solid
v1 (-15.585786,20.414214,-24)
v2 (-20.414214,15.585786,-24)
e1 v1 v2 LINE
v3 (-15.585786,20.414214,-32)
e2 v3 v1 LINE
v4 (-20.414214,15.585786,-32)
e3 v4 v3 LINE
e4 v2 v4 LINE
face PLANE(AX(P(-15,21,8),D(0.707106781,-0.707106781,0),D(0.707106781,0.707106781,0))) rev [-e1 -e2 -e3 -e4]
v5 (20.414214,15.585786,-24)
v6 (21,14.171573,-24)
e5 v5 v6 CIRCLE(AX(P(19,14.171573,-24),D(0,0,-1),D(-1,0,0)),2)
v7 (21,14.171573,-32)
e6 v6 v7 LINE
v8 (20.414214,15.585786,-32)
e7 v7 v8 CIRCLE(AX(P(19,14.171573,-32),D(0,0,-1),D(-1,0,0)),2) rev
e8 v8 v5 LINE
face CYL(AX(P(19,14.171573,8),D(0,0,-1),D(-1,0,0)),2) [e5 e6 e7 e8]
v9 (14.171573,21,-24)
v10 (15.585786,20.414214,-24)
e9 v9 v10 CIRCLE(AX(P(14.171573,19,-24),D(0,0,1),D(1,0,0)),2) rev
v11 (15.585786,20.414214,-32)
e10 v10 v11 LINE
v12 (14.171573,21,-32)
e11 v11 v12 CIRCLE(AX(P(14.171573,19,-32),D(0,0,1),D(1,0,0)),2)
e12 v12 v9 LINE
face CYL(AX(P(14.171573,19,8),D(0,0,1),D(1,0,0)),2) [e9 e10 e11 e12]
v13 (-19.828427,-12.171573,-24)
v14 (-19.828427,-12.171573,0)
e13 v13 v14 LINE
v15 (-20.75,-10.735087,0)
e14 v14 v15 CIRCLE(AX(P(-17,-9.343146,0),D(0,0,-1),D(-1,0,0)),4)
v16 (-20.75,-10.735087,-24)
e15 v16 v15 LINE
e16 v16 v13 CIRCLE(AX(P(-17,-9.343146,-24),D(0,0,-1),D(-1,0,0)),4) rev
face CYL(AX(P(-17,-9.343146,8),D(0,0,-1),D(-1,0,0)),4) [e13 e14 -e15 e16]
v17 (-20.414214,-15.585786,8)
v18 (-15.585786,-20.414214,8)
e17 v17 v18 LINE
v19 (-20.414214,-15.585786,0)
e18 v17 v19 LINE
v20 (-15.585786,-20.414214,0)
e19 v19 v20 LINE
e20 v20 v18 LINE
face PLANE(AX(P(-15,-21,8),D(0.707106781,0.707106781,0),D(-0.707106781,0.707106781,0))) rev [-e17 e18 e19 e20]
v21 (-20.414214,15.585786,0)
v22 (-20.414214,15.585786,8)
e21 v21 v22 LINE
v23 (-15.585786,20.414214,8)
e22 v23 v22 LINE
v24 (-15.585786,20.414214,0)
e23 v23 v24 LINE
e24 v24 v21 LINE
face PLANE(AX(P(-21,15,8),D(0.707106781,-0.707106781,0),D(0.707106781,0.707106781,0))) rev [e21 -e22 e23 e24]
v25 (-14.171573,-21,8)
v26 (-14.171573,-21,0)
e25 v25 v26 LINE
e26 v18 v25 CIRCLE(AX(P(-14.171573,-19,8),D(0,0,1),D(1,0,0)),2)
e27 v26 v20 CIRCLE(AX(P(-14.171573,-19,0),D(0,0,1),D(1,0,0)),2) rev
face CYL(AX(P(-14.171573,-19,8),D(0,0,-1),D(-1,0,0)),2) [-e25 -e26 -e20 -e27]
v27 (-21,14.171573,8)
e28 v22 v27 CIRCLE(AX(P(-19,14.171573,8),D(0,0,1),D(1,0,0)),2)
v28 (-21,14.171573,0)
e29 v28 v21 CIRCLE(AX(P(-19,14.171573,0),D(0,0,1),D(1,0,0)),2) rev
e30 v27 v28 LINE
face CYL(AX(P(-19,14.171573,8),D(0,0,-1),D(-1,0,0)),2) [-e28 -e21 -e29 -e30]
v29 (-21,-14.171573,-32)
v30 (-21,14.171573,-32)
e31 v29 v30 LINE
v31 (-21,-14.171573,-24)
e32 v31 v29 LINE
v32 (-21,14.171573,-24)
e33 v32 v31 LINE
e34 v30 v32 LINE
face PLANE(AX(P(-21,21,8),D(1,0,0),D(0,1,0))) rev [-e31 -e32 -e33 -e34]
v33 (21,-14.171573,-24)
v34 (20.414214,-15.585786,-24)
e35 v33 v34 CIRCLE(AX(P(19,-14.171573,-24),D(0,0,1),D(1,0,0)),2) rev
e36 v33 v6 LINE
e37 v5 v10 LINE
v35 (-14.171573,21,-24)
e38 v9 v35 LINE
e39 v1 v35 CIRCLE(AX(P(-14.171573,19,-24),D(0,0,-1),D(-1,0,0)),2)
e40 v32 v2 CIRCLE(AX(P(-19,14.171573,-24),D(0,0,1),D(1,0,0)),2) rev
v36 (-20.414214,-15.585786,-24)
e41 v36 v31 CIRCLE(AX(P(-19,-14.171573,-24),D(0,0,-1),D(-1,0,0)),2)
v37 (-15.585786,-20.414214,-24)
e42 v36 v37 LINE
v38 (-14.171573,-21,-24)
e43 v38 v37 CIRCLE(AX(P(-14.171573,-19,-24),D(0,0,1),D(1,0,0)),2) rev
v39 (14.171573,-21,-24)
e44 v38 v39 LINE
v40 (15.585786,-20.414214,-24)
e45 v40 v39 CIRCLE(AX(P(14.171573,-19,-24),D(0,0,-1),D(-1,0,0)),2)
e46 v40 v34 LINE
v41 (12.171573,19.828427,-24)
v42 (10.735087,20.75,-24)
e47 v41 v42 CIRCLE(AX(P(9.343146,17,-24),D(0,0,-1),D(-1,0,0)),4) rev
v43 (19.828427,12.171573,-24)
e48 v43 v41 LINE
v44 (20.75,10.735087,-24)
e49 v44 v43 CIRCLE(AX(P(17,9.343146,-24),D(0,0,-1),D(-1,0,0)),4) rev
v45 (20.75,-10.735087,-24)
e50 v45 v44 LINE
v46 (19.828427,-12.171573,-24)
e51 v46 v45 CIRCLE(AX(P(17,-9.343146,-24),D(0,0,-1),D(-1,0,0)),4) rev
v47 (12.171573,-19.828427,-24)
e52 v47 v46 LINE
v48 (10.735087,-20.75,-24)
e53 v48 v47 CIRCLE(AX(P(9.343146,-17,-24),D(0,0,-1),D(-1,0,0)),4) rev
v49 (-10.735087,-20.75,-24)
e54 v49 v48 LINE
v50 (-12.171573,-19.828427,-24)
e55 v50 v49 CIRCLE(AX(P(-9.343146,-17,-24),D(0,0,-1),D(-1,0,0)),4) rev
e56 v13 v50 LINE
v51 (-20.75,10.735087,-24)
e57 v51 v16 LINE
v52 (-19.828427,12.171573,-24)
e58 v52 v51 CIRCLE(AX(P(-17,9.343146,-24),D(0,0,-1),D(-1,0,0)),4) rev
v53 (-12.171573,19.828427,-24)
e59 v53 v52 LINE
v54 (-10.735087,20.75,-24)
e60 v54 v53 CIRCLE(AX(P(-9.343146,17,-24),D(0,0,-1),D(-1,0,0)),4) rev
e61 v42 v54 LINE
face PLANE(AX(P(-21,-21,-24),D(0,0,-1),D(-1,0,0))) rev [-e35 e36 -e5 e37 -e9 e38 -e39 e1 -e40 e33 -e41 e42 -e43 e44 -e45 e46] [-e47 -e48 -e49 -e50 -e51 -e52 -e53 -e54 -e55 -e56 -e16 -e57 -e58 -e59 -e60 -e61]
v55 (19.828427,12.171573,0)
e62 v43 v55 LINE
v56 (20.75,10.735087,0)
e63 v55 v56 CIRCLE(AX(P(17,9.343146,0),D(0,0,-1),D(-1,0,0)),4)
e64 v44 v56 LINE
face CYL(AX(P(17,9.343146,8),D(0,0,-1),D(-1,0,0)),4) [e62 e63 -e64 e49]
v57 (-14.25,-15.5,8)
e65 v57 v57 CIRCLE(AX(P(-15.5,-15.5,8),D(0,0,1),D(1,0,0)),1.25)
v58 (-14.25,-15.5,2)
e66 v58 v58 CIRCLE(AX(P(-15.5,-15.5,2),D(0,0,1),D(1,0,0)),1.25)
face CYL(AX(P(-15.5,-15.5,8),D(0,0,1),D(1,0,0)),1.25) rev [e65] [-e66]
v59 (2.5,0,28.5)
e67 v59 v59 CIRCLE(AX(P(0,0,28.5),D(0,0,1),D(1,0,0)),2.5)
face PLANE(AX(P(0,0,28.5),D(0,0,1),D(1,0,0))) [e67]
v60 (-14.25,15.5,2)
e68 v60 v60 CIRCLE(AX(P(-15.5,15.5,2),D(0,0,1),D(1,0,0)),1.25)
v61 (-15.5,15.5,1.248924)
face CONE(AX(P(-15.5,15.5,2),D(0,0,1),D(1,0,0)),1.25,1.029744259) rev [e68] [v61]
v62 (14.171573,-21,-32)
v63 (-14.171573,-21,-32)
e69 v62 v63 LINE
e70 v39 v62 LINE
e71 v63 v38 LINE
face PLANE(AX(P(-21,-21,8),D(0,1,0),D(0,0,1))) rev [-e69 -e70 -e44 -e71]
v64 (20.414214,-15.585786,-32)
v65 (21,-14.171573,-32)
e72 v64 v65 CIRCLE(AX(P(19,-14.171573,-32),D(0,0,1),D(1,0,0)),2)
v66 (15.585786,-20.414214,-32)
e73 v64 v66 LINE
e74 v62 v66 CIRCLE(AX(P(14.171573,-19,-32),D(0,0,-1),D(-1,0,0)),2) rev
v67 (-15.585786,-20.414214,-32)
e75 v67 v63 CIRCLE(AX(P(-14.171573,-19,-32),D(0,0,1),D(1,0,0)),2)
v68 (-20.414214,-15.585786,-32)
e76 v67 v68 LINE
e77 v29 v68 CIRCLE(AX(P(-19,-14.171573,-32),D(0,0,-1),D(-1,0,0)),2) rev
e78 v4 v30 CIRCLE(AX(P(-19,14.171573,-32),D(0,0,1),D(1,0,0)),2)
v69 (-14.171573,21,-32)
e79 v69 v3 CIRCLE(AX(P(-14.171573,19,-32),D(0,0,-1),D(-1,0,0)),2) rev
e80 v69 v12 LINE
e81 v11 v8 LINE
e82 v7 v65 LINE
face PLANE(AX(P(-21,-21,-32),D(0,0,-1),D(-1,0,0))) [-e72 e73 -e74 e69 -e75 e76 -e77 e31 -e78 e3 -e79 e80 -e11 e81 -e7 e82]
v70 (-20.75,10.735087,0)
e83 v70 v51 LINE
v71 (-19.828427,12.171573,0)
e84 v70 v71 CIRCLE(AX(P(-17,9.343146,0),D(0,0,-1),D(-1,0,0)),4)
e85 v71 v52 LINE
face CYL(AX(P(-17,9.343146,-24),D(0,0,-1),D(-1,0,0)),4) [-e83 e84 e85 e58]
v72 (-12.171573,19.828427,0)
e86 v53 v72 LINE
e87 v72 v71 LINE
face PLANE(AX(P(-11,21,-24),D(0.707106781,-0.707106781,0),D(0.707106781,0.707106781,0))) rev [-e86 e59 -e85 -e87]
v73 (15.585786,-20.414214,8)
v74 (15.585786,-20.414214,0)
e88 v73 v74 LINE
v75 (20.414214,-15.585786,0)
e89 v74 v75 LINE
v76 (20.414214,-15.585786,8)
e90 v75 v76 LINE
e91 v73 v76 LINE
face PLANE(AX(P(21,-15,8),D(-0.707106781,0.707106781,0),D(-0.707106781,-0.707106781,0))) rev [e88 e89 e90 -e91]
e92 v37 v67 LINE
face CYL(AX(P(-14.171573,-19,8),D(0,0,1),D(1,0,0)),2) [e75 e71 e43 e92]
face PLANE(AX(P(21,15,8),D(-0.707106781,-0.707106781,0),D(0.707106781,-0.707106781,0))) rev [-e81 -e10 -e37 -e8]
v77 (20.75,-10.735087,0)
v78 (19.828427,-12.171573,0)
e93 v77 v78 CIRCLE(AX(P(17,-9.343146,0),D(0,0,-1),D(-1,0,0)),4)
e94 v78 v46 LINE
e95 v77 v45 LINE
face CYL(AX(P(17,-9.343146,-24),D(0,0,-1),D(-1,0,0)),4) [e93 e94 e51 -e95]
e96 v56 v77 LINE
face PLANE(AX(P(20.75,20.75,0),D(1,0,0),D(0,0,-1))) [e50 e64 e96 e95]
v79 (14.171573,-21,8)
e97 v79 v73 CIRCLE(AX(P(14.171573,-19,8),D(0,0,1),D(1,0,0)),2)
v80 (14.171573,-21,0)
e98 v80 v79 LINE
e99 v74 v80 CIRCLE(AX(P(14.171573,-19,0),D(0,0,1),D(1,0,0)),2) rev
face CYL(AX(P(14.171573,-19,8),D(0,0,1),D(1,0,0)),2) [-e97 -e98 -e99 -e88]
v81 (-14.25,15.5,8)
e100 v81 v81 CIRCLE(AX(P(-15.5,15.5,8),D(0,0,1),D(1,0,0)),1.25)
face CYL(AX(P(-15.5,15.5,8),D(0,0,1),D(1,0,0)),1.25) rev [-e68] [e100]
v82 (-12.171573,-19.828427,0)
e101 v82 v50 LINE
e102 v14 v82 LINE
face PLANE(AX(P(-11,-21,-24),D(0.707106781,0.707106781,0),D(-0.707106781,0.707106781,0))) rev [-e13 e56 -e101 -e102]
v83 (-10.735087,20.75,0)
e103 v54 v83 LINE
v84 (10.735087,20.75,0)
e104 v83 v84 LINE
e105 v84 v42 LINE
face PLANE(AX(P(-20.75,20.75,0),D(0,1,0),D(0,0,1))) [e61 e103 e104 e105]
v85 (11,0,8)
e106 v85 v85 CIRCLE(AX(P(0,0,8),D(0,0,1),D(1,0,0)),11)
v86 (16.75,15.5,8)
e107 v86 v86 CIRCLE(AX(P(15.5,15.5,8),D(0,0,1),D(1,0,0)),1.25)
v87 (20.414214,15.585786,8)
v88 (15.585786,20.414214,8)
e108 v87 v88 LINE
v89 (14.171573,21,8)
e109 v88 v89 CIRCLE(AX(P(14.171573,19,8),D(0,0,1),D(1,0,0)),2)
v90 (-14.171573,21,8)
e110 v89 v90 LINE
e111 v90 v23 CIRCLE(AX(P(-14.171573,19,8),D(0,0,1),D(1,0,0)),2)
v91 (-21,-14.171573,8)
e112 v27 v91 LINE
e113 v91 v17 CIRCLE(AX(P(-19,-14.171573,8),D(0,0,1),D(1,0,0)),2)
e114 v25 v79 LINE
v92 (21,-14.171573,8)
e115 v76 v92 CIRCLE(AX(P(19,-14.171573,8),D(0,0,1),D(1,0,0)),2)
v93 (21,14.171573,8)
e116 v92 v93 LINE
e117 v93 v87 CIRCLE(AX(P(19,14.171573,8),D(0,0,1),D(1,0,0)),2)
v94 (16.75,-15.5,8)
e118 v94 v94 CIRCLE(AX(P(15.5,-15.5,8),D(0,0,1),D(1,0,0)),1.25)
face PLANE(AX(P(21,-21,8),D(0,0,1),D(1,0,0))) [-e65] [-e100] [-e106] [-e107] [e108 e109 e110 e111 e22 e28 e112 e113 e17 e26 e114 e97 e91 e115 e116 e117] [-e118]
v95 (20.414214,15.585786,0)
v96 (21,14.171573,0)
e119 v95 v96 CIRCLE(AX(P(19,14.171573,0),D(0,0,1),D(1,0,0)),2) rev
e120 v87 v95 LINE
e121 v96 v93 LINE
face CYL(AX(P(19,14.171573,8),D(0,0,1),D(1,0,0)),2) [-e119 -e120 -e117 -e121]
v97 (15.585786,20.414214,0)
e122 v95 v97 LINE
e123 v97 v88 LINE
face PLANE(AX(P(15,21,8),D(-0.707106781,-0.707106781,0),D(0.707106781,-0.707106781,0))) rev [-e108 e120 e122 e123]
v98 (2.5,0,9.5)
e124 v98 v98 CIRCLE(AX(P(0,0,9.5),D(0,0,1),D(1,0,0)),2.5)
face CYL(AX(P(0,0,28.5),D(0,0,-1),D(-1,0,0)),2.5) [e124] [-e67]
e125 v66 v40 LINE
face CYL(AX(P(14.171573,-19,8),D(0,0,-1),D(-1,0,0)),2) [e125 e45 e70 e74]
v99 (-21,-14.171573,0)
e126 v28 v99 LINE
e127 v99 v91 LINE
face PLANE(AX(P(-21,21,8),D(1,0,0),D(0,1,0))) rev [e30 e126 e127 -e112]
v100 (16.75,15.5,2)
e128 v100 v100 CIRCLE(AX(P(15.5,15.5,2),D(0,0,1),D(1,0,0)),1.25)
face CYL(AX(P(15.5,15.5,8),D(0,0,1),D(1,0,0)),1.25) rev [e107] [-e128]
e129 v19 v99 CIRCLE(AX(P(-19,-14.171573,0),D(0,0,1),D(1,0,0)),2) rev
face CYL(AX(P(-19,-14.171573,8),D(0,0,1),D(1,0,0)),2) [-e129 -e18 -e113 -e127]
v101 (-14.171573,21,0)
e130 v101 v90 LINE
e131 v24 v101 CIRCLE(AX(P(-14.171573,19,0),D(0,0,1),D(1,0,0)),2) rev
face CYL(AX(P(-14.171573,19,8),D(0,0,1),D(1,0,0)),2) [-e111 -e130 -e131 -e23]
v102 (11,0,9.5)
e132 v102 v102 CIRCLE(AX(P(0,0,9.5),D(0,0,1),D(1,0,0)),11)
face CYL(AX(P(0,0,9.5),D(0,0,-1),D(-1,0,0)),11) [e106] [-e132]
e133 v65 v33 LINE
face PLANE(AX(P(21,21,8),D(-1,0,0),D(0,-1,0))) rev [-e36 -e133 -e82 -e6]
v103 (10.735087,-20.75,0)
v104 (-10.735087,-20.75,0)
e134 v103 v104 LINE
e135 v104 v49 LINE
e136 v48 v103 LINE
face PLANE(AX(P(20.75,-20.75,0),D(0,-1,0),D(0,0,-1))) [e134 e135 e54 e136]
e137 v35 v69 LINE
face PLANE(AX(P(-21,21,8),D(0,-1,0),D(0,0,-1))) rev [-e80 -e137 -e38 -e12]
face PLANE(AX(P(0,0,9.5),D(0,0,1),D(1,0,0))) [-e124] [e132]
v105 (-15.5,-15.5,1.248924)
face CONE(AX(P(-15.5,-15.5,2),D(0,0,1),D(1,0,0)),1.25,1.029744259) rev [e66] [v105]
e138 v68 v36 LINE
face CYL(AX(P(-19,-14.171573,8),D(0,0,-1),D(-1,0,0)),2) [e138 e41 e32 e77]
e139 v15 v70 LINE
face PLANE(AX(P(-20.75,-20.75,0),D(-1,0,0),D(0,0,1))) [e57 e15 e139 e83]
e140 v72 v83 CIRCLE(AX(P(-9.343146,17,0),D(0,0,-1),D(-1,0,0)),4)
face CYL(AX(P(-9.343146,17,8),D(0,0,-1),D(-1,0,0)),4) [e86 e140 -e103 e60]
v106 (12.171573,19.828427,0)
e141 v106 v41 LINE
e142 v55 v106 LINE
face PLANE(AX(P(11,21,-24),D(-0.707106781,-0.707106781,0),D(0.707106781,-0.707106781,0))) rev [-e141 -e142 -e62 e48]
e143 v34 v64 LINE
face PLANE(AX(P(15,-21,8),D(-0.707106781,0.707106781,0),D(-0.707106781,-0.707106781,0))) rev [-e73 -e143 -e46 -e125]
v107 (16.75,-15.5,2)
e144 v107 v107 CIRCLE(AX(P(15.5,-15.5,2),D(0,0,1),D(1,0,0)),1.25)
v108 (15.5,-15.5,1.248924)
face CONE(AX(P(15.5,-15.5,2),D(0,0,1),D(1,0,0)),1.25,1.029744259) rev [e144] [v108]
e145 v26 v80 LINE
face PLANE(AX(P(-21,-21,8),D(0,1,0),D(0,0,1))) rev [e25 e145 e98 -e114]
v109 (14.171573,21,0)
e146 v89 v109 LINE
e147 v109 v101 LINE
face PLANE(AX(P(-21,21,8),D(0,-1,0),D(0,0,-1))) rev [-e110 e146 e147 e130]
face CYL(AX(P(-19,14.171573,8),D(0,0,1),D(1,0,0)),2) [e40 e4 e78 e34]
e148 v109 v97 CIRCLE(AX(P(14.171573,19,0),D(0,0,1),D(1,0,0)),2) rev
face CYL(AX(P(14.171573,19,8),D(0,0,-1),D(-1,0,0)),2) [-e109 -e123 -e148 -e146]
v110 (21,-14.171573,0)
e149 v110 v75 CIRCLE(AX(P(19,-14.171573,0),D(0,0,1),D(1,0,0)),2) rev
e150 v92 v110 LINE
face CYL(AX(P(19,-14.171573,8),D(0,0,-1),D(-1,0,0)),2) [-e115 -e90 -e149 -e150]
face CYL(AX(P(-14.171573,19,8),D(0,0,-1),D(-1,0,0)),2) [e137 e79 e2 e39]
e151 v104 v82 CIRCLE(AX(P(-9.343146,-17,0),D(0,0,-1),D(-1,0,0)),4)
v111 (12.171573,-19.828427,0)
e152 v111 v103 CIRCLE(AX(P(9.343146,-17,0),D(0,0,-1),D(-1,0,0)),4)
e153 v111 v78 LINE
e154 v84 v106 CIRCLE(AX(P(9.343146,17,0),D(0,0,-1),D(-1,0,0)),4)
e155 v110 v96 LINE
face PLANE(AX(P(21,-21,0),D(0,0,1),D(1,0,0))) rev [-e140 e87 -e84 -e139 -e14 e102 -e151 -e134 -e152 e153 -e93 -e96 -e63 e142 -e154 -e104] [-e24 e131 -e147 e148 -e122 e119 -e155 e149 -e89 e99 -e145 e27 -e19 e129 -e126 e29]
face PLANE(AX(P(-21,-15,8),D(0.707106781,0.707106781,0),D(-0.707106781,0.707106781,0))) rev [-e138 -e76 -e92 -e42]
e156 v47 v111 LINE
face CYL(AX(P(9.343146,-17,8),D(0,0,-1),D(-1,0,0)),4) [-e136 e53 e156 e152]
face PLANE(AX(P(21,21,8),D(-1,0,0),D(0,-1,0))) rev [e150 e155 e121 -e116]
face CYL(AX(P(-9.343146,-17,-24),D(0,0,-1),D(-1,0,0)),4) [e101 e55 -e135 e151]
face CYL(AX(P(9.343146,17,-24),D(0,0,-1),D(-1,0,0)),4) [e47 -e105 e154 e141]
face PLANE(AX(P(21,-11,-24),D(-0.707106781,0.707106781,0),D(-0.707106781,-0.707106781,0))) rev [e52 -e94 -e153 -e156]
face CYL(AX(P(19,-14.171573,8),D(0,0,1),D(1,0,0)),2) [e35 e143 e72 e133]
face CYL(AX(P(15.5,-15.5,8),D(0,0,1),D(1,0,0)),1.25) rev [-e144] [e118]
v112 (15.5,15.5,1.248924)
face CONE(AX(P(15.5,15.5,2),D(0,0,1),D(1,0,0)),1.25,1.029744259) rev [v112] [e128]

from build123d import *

# Parameters (mm, degrees)
EXTRUDE_START               = -40
EXTRUDE_2_DEPTH             = 40
EXTRUDE_START_2             = -8
EXTRUDE_2_2_DEPTH           = 8
EXTRUDE_2_3_DEPTH           = 8
EXTRUDE_2_4_OUTLINE_R       = 2.5
EXTRUDE_2_4_DEPTH           = 20.5
FILLET_1_R                  = 2
HOLE_WIZARD_2_5_2_5_1_D     = 2.5
HOLE_WIZARD_2_5_2_5_1_DEPTH = 6
HOLE_WIZARD_2_5_2_5_1_TIP   = 0.751075774
HOLE_WIZARD_2_5_2_5_2_D     = 2.5
HOLE_WIZARD_2_5_2_5_2_DEPTH = 6
HOLE_WIZARD_2_5_2_5_2_TIP   = 0.751075774
HOLE_WIZARD_2_5_2_5_3_D     = 2.5
HOLE_WIZARD_2_5_2_5_3_DEPTH = 6
HOLE_WIZARD_2_5_2_5_3_TIP   = 0.751075774
HOLE_WIZARD_2_5_2_5_4_D     = 2.5
HOLE_WIZARD_2_5_2_5_4_DEPTH = 6
HOLE_WIZARD_2_5_2_5_4_TIP   = 0.751075774
SKETCH_15_R                 = 11
SKETCH_15_R_2               = 2
EXTRUDE_3_DEPTH             = 1.5


with BuildPart() as part:
    # Бобышка-Вытянуть2: read off the stored shape, not the designer's step
    # Бобышка-Вытянуть2 outline → Бобышка-Вытянуть2 (new body)
    with BuildSketch(Plane.XY.offset(8).offset(EXTRUDE_START)):
        with BuildLine():
            ThreePointArc((19.828427125, -12.171572875), (20.366719307, -11.503053413), (20.75, -10.735086841))
            Line((20.75, -10.735086841), (20.75, 10.735086841))
            ThreePointArc((20.75, 10.735086841), (20.366719307, 11.503053413), (19.828427125, 12.171572875))
            Line((19.828427125, 12.171572875), (12.171572875, 19.828427125))
            ThreePointArc((12.171572875, 19.828427125), (11.503053413, 20.366719307), (10.735086841, 20.75))
            Line((10.735086841, 20.75), (-10.735086841, 20.75))
            ThreePointArc((-10.735086841, 20.75), (-11.503053413, 20.366719307), (-12.171572875, 19.828427125))
            Line((-12.171572875, 19.828427125), (-19.828427125, 12.171572875))
            ThreePointArc((-19.828427125, 12.171572875), (-20.366719307, 11.503053413), (-20.75, 10.735086841))
            Line((-20.75, 10.735086841), (-20.75, -10.735086841))
            ThreePointArc((-20.75, -10.735086841), (-20.366719307, -11.503053413), (-19.828427125, -12.171572875))
            Line((-19.828427125, -12.171572875), (-12.171572875, -19.828427125))
            ThreePointArc((-12.171572875, -19.828427125), (-11.503053413, -20.366719307), (-10.735086841, -20.75))
            Line((-10.735086841, -20.75), (10.735086841, -20.75))
            ThreePointArc((10.735086841, -20.75), (11.503053413, -20.366719307), (12.171572875, -19.828427125))
            Line((12.171572875, -19.828427125), (19.828427125, -12.171572875))
        make_face()
    extrude(amount=EXTRUDE_2_DEPTH)

    # Extrude 2 2 outline → Extrude 2 2 (add)
    with BuildSketch(Plane.XY.offset(8).offset(EXTRUDE_START_2)):
        Polygon((21, 15), (15, 21), (-15, 21), (-21, 15), (-21, -15), (-15, -21), (15, -21), (21, -15), align=None)
        with BuildLine():
            ThreePointArc((20.75, -10.735086841), (20.366719307, -11.503053413), (19.828427125, -12.171572875))
            Line((19.828427125, -12.171572875), (12.171572875, -19.828427125))
            ThreePointArc((12.171572875, -19.828427125), (11.503053413, -20.366719307), (10.735086841, -20.75))
            Line((10.735086841, -20.75), (-10.735086841, -20.75))
            ThreePointArc((-10.735086841, -20.75), (-11.503053413, -20.366719307), (-12.171572875, -19.828427125))
            Line((-12.171572875, -19.828427125), (-19.828427125, -12.171572875))
            ThreePointArc((-19.828427125, -12.171572875), (-20.366719307, -11.503053413), (-20.75, -10.735086841))
            Line((-20.75, -10.735086841), (-20.75, 10.735086841))
            ThreePointArc((-20.75, 10.735086841), (-20.366719307, 11.503053413), (-19.828427125, 12.171572875))
            Line((-19.828427125, 12.171572875), (-12.171572875, 19.828427125))
            ThreePointArc((-12.171572875, 19.828427125), (-11.503053413, 20.366719307), (-10.735086841, 20.75))
            Line((-10.735086841, 20.75), (10.735086841, 20.75))
            ThreePointArc((10.735086841, 20.75), (11.503053413, 20.366719307), (12.171572875, 19.828427125))
            Line((12.171572875, 19.828427125), (19.828427125, 12.171572875))
            ThreePointArc((19.828427125, 12.171572875), (20.366719307, 11.503053413), (20.75, 10.735086841))
            Line((20.75, 10.735086841), (20.75, -10.735086841))
        make_face(mode=Mode.SUBTRACT)
    extrude(amount=EXTRUDE_2_2_DEPTH)

    # Extrude 2 3 outline → Extrude 2 3 (add)
    with BuildSketch(Plane.XY.offset(8).offset(EXTRUDE_START)):
        with BuildLine():
            Line((21, -14.171572875), (21, 14.171572875))
            ThreePointArc((21, 14.171572875), (20.847759065, 14.93693974), (20.414213562, 15.585786438))
            Line((20.414213562, 15.585786438), (15.585786438, 20.414213562))
            ThreePointArc((15.585786438, 20.414213562), (14.93693974, 20.847759065), (14.171572875, 21))
            Line((14.171572875, 21), (-14.171572875, 21))
            ThreePointArc((-14.171572875, 21), (-14.93693974, 20.847759065), (-15.585786438, 20.414213562))
            Line((-15.585786438, 20.414213562), (-20.414213562, 15.585786438))
            ThreePointArc((-20.414213562, 15.585786438), (-20.847759065, 14.93693974), (-21, 14.171572875))
            Line((-21, 14.171572875), (-21, -14.171572875))
            ThreePointArc((-21, -14.171572875), (-20.847759065, -14.93693974), (-20.414213562, -15.585786438))
            Line((-20.414213562, -15.585786438), (-15.585786438, -20.414213562))
            ThreePointArc((-15.585786438, -20.414213562), (-14.93693974, -20.847759065), (-14.171572875, -21))
            Line((-14.171572875, -21), (14.171572875, -21))
            ThreePointArc((14.171572875, -21), (14.93693974, -20.847759065), (15.585786438, -20.414213562))
            Line((15.585786438, -20.414213562), (20.414213562, -15.585786438))
            ThreePointArc((20.414213562, -15.585786438), (20.847759065, -14.93693974), (21, -14.171572875))
        make_face()
        with BuildLine():
            Line((20.75, 10.735086841), (20.75, -10.735086841))
            ThreePointArc((20.75, -10.735086841), (20.366719307, -11.503053413), (19.828427125, -12.171572875))
            Line((19.828427125, -12.171572875), (12.171572875, -19.828427125))
            ThreePointArc((12.171572875, -19.828427125), (11.503053413, -20.366719307), (10.735086841, -20.75))
            Line((10.735086841, -20.75), (-10.735086841, -20.75))
            ThreePointArc((-10.735086841, -20.75), (-11.503053413, -20.366719307), (-12.171572875, -19.828427125))
            Line((-12.171572875, -19.828427125), (-19.828427125, -12.171572875))
            ThreePointArc((-19.828427125, -12.171572875), (-20.366719307, -11.503053413), (-20.75, -10.735086841))
            Line((-20.75, -10.735086841), (-20.75, 10.735086841))
            ThreePointArc((-20.75, 10.735086841), (-20.366719307, 11.503053413), (-19.828427125, 12.171572875))
            Line((-19.828427125, 12.171572875), (-12.171572875, 19.828427125))
            ThreePointArc((-12.171572875, 19.828427125), (-11.503053413, 20.366719307), (-10.735086841, 20.75))
            Line((-10.735086841, 20.75), (10.735086841, 20.75))
            ThreePointArc((10.735086841, 20.75), (11.503053413, 20.366719307), (12.171572875, 19.828427125))
            Line((12.171572875, 19.828427125), (19.828427125, 12.171572875))
            ThreePointArc((19.828427125, 12.171572875), (20.366719307, 11.503053413), (20.75, 10.735086841))
        make_face(mode=Mode.SUBTRACT)
    extrude(amount=EXTRUDE_2_3_DEPTH)

    # Extrude 2 4 outline → Extrude 2 4 (add)
    with BuildSketch(Plane.XY.offset(8)):
        Circle(EXTRUDE_2_4_OUTLINE_R)
    extrude(amount=EXTRUDE_2_4_DEPTH)

    # Скругление1
    fillet_1_edges = [part.edges().sort_by_distance(p)[0] for p in [
        (15, -21, 4),
        (-15, -21, 4),
        (-21, -15, 4),
        (15, 21, 4),
        (21, -15, 4),
        (-15, 21, 4),
        (21, 15, 4),
        (-21, 15, 4),
    ]]
    fillet(fillet_1_edges, radius=FILLET_1_R)

    # Диаметр отверстия Ø2.5 (2.5)1
    with Locations(Plane.XY.offset(8)):
        with Locations((-15.5, 15.5)):
            Hole(HOLE_WIZARD_2_5_2_5_1_D / 2, depth=HOLE_WIZARD_2_5_2_5_1_DEPTH)
            with Locations((0, 0, -(HOLE_WIZARD_2_5_2_5_1_DEPTH + HOLE_WIZARD_2_5_2_5_1_TIP / 2))):  # 118° drill point
                Cone(0, HOLE_WIZARD_2_5_2_5_1_D / 2, HOLE_WIZARD_2_5_2_5_1_TIP, mode=Mode.SUBTRACT)

    # Диаметр отверстия Ø2.5 (2.5)2
    with Locations(Plane.XY.offset(8)):
        with Locations((15.5, 15.5)):
            Hole(HOLE_WIZARD_2_5_2_5_2_D / 2, depth=HOLE_WIZARD_2_5_2_5_2_DEPTH)
            with Locations((0, 0, -(HOLE_WIZARD_2_5_2_5_2_DEPTH + HOLE_WIZARD_2_5_2_5_2_TIP / 2))):  # 118° drill point
                Cone(0, HOLE_WIZARD_2_5_2_5_2_D / 2, HOLE_WIZARD_2_5_2_5_2_TIP, mode=Mode.SUBTRACT)

    # Диаметр отверстия Ø2.5 (2.5)3
    with Locations(Plane.XY.offset(8)):
        with Locations((-15.5, -15.5)):
            Hole(HOLE_WIZARD_2_5_2_5_3_D / 2, depth=HOLE_WIZARD_2_5_2_5_3_DEPTH)
            with Locations((0, 0, -(HOLE_WIZARD_2_5_2_5_3_DEPTH + HOLE_WIZARD_2_5_2_5_3_TIP / 2))):  # 118° drill point
                Cone(0, HOLE_WIZARD_2_5_2_5_3_D / 2, HOLE_WIZARD_2_5_2_5_3_TIP, mode=Mode.SUBTRACT)

    # Диаметр отверстия Ø2.5 (2.5)4
    with Locations(Plane.XY.offset(8)):
        with Locations((15.5, -15.5)):
            Hole(HOLE_WIZARD_2_5_2_5_4_D / 2, depth=HOLE_WIZARD_2_5_2_5_4_DEPTH)
            with Locations((0, 0, -(HOLE_WIZARD_2_5_2_5_4_DEPTH + HOLE_WIZARD_2_5_2_5_4_TIP / 2))):  # 118° drill point
                Cone(0, HOLE_WIZARD_2_5_2_5_4_D / 2, HOLE_WIZARD_2_5_2_5_4_TIP, mode=Mode.SUBTRACT)

    # Эскиз15 → Бобышка-Вытянуть3 (add)
    with BuildSketch(Plane.XY.offset(8)):
        Circle(SKETCH_15_R)
        Circle(SKETCH_15_R_2, mode=Mode.SUBTRACT)
    extrude(amount=EXTRUDE_3_DEPTH)


solid = part.part
